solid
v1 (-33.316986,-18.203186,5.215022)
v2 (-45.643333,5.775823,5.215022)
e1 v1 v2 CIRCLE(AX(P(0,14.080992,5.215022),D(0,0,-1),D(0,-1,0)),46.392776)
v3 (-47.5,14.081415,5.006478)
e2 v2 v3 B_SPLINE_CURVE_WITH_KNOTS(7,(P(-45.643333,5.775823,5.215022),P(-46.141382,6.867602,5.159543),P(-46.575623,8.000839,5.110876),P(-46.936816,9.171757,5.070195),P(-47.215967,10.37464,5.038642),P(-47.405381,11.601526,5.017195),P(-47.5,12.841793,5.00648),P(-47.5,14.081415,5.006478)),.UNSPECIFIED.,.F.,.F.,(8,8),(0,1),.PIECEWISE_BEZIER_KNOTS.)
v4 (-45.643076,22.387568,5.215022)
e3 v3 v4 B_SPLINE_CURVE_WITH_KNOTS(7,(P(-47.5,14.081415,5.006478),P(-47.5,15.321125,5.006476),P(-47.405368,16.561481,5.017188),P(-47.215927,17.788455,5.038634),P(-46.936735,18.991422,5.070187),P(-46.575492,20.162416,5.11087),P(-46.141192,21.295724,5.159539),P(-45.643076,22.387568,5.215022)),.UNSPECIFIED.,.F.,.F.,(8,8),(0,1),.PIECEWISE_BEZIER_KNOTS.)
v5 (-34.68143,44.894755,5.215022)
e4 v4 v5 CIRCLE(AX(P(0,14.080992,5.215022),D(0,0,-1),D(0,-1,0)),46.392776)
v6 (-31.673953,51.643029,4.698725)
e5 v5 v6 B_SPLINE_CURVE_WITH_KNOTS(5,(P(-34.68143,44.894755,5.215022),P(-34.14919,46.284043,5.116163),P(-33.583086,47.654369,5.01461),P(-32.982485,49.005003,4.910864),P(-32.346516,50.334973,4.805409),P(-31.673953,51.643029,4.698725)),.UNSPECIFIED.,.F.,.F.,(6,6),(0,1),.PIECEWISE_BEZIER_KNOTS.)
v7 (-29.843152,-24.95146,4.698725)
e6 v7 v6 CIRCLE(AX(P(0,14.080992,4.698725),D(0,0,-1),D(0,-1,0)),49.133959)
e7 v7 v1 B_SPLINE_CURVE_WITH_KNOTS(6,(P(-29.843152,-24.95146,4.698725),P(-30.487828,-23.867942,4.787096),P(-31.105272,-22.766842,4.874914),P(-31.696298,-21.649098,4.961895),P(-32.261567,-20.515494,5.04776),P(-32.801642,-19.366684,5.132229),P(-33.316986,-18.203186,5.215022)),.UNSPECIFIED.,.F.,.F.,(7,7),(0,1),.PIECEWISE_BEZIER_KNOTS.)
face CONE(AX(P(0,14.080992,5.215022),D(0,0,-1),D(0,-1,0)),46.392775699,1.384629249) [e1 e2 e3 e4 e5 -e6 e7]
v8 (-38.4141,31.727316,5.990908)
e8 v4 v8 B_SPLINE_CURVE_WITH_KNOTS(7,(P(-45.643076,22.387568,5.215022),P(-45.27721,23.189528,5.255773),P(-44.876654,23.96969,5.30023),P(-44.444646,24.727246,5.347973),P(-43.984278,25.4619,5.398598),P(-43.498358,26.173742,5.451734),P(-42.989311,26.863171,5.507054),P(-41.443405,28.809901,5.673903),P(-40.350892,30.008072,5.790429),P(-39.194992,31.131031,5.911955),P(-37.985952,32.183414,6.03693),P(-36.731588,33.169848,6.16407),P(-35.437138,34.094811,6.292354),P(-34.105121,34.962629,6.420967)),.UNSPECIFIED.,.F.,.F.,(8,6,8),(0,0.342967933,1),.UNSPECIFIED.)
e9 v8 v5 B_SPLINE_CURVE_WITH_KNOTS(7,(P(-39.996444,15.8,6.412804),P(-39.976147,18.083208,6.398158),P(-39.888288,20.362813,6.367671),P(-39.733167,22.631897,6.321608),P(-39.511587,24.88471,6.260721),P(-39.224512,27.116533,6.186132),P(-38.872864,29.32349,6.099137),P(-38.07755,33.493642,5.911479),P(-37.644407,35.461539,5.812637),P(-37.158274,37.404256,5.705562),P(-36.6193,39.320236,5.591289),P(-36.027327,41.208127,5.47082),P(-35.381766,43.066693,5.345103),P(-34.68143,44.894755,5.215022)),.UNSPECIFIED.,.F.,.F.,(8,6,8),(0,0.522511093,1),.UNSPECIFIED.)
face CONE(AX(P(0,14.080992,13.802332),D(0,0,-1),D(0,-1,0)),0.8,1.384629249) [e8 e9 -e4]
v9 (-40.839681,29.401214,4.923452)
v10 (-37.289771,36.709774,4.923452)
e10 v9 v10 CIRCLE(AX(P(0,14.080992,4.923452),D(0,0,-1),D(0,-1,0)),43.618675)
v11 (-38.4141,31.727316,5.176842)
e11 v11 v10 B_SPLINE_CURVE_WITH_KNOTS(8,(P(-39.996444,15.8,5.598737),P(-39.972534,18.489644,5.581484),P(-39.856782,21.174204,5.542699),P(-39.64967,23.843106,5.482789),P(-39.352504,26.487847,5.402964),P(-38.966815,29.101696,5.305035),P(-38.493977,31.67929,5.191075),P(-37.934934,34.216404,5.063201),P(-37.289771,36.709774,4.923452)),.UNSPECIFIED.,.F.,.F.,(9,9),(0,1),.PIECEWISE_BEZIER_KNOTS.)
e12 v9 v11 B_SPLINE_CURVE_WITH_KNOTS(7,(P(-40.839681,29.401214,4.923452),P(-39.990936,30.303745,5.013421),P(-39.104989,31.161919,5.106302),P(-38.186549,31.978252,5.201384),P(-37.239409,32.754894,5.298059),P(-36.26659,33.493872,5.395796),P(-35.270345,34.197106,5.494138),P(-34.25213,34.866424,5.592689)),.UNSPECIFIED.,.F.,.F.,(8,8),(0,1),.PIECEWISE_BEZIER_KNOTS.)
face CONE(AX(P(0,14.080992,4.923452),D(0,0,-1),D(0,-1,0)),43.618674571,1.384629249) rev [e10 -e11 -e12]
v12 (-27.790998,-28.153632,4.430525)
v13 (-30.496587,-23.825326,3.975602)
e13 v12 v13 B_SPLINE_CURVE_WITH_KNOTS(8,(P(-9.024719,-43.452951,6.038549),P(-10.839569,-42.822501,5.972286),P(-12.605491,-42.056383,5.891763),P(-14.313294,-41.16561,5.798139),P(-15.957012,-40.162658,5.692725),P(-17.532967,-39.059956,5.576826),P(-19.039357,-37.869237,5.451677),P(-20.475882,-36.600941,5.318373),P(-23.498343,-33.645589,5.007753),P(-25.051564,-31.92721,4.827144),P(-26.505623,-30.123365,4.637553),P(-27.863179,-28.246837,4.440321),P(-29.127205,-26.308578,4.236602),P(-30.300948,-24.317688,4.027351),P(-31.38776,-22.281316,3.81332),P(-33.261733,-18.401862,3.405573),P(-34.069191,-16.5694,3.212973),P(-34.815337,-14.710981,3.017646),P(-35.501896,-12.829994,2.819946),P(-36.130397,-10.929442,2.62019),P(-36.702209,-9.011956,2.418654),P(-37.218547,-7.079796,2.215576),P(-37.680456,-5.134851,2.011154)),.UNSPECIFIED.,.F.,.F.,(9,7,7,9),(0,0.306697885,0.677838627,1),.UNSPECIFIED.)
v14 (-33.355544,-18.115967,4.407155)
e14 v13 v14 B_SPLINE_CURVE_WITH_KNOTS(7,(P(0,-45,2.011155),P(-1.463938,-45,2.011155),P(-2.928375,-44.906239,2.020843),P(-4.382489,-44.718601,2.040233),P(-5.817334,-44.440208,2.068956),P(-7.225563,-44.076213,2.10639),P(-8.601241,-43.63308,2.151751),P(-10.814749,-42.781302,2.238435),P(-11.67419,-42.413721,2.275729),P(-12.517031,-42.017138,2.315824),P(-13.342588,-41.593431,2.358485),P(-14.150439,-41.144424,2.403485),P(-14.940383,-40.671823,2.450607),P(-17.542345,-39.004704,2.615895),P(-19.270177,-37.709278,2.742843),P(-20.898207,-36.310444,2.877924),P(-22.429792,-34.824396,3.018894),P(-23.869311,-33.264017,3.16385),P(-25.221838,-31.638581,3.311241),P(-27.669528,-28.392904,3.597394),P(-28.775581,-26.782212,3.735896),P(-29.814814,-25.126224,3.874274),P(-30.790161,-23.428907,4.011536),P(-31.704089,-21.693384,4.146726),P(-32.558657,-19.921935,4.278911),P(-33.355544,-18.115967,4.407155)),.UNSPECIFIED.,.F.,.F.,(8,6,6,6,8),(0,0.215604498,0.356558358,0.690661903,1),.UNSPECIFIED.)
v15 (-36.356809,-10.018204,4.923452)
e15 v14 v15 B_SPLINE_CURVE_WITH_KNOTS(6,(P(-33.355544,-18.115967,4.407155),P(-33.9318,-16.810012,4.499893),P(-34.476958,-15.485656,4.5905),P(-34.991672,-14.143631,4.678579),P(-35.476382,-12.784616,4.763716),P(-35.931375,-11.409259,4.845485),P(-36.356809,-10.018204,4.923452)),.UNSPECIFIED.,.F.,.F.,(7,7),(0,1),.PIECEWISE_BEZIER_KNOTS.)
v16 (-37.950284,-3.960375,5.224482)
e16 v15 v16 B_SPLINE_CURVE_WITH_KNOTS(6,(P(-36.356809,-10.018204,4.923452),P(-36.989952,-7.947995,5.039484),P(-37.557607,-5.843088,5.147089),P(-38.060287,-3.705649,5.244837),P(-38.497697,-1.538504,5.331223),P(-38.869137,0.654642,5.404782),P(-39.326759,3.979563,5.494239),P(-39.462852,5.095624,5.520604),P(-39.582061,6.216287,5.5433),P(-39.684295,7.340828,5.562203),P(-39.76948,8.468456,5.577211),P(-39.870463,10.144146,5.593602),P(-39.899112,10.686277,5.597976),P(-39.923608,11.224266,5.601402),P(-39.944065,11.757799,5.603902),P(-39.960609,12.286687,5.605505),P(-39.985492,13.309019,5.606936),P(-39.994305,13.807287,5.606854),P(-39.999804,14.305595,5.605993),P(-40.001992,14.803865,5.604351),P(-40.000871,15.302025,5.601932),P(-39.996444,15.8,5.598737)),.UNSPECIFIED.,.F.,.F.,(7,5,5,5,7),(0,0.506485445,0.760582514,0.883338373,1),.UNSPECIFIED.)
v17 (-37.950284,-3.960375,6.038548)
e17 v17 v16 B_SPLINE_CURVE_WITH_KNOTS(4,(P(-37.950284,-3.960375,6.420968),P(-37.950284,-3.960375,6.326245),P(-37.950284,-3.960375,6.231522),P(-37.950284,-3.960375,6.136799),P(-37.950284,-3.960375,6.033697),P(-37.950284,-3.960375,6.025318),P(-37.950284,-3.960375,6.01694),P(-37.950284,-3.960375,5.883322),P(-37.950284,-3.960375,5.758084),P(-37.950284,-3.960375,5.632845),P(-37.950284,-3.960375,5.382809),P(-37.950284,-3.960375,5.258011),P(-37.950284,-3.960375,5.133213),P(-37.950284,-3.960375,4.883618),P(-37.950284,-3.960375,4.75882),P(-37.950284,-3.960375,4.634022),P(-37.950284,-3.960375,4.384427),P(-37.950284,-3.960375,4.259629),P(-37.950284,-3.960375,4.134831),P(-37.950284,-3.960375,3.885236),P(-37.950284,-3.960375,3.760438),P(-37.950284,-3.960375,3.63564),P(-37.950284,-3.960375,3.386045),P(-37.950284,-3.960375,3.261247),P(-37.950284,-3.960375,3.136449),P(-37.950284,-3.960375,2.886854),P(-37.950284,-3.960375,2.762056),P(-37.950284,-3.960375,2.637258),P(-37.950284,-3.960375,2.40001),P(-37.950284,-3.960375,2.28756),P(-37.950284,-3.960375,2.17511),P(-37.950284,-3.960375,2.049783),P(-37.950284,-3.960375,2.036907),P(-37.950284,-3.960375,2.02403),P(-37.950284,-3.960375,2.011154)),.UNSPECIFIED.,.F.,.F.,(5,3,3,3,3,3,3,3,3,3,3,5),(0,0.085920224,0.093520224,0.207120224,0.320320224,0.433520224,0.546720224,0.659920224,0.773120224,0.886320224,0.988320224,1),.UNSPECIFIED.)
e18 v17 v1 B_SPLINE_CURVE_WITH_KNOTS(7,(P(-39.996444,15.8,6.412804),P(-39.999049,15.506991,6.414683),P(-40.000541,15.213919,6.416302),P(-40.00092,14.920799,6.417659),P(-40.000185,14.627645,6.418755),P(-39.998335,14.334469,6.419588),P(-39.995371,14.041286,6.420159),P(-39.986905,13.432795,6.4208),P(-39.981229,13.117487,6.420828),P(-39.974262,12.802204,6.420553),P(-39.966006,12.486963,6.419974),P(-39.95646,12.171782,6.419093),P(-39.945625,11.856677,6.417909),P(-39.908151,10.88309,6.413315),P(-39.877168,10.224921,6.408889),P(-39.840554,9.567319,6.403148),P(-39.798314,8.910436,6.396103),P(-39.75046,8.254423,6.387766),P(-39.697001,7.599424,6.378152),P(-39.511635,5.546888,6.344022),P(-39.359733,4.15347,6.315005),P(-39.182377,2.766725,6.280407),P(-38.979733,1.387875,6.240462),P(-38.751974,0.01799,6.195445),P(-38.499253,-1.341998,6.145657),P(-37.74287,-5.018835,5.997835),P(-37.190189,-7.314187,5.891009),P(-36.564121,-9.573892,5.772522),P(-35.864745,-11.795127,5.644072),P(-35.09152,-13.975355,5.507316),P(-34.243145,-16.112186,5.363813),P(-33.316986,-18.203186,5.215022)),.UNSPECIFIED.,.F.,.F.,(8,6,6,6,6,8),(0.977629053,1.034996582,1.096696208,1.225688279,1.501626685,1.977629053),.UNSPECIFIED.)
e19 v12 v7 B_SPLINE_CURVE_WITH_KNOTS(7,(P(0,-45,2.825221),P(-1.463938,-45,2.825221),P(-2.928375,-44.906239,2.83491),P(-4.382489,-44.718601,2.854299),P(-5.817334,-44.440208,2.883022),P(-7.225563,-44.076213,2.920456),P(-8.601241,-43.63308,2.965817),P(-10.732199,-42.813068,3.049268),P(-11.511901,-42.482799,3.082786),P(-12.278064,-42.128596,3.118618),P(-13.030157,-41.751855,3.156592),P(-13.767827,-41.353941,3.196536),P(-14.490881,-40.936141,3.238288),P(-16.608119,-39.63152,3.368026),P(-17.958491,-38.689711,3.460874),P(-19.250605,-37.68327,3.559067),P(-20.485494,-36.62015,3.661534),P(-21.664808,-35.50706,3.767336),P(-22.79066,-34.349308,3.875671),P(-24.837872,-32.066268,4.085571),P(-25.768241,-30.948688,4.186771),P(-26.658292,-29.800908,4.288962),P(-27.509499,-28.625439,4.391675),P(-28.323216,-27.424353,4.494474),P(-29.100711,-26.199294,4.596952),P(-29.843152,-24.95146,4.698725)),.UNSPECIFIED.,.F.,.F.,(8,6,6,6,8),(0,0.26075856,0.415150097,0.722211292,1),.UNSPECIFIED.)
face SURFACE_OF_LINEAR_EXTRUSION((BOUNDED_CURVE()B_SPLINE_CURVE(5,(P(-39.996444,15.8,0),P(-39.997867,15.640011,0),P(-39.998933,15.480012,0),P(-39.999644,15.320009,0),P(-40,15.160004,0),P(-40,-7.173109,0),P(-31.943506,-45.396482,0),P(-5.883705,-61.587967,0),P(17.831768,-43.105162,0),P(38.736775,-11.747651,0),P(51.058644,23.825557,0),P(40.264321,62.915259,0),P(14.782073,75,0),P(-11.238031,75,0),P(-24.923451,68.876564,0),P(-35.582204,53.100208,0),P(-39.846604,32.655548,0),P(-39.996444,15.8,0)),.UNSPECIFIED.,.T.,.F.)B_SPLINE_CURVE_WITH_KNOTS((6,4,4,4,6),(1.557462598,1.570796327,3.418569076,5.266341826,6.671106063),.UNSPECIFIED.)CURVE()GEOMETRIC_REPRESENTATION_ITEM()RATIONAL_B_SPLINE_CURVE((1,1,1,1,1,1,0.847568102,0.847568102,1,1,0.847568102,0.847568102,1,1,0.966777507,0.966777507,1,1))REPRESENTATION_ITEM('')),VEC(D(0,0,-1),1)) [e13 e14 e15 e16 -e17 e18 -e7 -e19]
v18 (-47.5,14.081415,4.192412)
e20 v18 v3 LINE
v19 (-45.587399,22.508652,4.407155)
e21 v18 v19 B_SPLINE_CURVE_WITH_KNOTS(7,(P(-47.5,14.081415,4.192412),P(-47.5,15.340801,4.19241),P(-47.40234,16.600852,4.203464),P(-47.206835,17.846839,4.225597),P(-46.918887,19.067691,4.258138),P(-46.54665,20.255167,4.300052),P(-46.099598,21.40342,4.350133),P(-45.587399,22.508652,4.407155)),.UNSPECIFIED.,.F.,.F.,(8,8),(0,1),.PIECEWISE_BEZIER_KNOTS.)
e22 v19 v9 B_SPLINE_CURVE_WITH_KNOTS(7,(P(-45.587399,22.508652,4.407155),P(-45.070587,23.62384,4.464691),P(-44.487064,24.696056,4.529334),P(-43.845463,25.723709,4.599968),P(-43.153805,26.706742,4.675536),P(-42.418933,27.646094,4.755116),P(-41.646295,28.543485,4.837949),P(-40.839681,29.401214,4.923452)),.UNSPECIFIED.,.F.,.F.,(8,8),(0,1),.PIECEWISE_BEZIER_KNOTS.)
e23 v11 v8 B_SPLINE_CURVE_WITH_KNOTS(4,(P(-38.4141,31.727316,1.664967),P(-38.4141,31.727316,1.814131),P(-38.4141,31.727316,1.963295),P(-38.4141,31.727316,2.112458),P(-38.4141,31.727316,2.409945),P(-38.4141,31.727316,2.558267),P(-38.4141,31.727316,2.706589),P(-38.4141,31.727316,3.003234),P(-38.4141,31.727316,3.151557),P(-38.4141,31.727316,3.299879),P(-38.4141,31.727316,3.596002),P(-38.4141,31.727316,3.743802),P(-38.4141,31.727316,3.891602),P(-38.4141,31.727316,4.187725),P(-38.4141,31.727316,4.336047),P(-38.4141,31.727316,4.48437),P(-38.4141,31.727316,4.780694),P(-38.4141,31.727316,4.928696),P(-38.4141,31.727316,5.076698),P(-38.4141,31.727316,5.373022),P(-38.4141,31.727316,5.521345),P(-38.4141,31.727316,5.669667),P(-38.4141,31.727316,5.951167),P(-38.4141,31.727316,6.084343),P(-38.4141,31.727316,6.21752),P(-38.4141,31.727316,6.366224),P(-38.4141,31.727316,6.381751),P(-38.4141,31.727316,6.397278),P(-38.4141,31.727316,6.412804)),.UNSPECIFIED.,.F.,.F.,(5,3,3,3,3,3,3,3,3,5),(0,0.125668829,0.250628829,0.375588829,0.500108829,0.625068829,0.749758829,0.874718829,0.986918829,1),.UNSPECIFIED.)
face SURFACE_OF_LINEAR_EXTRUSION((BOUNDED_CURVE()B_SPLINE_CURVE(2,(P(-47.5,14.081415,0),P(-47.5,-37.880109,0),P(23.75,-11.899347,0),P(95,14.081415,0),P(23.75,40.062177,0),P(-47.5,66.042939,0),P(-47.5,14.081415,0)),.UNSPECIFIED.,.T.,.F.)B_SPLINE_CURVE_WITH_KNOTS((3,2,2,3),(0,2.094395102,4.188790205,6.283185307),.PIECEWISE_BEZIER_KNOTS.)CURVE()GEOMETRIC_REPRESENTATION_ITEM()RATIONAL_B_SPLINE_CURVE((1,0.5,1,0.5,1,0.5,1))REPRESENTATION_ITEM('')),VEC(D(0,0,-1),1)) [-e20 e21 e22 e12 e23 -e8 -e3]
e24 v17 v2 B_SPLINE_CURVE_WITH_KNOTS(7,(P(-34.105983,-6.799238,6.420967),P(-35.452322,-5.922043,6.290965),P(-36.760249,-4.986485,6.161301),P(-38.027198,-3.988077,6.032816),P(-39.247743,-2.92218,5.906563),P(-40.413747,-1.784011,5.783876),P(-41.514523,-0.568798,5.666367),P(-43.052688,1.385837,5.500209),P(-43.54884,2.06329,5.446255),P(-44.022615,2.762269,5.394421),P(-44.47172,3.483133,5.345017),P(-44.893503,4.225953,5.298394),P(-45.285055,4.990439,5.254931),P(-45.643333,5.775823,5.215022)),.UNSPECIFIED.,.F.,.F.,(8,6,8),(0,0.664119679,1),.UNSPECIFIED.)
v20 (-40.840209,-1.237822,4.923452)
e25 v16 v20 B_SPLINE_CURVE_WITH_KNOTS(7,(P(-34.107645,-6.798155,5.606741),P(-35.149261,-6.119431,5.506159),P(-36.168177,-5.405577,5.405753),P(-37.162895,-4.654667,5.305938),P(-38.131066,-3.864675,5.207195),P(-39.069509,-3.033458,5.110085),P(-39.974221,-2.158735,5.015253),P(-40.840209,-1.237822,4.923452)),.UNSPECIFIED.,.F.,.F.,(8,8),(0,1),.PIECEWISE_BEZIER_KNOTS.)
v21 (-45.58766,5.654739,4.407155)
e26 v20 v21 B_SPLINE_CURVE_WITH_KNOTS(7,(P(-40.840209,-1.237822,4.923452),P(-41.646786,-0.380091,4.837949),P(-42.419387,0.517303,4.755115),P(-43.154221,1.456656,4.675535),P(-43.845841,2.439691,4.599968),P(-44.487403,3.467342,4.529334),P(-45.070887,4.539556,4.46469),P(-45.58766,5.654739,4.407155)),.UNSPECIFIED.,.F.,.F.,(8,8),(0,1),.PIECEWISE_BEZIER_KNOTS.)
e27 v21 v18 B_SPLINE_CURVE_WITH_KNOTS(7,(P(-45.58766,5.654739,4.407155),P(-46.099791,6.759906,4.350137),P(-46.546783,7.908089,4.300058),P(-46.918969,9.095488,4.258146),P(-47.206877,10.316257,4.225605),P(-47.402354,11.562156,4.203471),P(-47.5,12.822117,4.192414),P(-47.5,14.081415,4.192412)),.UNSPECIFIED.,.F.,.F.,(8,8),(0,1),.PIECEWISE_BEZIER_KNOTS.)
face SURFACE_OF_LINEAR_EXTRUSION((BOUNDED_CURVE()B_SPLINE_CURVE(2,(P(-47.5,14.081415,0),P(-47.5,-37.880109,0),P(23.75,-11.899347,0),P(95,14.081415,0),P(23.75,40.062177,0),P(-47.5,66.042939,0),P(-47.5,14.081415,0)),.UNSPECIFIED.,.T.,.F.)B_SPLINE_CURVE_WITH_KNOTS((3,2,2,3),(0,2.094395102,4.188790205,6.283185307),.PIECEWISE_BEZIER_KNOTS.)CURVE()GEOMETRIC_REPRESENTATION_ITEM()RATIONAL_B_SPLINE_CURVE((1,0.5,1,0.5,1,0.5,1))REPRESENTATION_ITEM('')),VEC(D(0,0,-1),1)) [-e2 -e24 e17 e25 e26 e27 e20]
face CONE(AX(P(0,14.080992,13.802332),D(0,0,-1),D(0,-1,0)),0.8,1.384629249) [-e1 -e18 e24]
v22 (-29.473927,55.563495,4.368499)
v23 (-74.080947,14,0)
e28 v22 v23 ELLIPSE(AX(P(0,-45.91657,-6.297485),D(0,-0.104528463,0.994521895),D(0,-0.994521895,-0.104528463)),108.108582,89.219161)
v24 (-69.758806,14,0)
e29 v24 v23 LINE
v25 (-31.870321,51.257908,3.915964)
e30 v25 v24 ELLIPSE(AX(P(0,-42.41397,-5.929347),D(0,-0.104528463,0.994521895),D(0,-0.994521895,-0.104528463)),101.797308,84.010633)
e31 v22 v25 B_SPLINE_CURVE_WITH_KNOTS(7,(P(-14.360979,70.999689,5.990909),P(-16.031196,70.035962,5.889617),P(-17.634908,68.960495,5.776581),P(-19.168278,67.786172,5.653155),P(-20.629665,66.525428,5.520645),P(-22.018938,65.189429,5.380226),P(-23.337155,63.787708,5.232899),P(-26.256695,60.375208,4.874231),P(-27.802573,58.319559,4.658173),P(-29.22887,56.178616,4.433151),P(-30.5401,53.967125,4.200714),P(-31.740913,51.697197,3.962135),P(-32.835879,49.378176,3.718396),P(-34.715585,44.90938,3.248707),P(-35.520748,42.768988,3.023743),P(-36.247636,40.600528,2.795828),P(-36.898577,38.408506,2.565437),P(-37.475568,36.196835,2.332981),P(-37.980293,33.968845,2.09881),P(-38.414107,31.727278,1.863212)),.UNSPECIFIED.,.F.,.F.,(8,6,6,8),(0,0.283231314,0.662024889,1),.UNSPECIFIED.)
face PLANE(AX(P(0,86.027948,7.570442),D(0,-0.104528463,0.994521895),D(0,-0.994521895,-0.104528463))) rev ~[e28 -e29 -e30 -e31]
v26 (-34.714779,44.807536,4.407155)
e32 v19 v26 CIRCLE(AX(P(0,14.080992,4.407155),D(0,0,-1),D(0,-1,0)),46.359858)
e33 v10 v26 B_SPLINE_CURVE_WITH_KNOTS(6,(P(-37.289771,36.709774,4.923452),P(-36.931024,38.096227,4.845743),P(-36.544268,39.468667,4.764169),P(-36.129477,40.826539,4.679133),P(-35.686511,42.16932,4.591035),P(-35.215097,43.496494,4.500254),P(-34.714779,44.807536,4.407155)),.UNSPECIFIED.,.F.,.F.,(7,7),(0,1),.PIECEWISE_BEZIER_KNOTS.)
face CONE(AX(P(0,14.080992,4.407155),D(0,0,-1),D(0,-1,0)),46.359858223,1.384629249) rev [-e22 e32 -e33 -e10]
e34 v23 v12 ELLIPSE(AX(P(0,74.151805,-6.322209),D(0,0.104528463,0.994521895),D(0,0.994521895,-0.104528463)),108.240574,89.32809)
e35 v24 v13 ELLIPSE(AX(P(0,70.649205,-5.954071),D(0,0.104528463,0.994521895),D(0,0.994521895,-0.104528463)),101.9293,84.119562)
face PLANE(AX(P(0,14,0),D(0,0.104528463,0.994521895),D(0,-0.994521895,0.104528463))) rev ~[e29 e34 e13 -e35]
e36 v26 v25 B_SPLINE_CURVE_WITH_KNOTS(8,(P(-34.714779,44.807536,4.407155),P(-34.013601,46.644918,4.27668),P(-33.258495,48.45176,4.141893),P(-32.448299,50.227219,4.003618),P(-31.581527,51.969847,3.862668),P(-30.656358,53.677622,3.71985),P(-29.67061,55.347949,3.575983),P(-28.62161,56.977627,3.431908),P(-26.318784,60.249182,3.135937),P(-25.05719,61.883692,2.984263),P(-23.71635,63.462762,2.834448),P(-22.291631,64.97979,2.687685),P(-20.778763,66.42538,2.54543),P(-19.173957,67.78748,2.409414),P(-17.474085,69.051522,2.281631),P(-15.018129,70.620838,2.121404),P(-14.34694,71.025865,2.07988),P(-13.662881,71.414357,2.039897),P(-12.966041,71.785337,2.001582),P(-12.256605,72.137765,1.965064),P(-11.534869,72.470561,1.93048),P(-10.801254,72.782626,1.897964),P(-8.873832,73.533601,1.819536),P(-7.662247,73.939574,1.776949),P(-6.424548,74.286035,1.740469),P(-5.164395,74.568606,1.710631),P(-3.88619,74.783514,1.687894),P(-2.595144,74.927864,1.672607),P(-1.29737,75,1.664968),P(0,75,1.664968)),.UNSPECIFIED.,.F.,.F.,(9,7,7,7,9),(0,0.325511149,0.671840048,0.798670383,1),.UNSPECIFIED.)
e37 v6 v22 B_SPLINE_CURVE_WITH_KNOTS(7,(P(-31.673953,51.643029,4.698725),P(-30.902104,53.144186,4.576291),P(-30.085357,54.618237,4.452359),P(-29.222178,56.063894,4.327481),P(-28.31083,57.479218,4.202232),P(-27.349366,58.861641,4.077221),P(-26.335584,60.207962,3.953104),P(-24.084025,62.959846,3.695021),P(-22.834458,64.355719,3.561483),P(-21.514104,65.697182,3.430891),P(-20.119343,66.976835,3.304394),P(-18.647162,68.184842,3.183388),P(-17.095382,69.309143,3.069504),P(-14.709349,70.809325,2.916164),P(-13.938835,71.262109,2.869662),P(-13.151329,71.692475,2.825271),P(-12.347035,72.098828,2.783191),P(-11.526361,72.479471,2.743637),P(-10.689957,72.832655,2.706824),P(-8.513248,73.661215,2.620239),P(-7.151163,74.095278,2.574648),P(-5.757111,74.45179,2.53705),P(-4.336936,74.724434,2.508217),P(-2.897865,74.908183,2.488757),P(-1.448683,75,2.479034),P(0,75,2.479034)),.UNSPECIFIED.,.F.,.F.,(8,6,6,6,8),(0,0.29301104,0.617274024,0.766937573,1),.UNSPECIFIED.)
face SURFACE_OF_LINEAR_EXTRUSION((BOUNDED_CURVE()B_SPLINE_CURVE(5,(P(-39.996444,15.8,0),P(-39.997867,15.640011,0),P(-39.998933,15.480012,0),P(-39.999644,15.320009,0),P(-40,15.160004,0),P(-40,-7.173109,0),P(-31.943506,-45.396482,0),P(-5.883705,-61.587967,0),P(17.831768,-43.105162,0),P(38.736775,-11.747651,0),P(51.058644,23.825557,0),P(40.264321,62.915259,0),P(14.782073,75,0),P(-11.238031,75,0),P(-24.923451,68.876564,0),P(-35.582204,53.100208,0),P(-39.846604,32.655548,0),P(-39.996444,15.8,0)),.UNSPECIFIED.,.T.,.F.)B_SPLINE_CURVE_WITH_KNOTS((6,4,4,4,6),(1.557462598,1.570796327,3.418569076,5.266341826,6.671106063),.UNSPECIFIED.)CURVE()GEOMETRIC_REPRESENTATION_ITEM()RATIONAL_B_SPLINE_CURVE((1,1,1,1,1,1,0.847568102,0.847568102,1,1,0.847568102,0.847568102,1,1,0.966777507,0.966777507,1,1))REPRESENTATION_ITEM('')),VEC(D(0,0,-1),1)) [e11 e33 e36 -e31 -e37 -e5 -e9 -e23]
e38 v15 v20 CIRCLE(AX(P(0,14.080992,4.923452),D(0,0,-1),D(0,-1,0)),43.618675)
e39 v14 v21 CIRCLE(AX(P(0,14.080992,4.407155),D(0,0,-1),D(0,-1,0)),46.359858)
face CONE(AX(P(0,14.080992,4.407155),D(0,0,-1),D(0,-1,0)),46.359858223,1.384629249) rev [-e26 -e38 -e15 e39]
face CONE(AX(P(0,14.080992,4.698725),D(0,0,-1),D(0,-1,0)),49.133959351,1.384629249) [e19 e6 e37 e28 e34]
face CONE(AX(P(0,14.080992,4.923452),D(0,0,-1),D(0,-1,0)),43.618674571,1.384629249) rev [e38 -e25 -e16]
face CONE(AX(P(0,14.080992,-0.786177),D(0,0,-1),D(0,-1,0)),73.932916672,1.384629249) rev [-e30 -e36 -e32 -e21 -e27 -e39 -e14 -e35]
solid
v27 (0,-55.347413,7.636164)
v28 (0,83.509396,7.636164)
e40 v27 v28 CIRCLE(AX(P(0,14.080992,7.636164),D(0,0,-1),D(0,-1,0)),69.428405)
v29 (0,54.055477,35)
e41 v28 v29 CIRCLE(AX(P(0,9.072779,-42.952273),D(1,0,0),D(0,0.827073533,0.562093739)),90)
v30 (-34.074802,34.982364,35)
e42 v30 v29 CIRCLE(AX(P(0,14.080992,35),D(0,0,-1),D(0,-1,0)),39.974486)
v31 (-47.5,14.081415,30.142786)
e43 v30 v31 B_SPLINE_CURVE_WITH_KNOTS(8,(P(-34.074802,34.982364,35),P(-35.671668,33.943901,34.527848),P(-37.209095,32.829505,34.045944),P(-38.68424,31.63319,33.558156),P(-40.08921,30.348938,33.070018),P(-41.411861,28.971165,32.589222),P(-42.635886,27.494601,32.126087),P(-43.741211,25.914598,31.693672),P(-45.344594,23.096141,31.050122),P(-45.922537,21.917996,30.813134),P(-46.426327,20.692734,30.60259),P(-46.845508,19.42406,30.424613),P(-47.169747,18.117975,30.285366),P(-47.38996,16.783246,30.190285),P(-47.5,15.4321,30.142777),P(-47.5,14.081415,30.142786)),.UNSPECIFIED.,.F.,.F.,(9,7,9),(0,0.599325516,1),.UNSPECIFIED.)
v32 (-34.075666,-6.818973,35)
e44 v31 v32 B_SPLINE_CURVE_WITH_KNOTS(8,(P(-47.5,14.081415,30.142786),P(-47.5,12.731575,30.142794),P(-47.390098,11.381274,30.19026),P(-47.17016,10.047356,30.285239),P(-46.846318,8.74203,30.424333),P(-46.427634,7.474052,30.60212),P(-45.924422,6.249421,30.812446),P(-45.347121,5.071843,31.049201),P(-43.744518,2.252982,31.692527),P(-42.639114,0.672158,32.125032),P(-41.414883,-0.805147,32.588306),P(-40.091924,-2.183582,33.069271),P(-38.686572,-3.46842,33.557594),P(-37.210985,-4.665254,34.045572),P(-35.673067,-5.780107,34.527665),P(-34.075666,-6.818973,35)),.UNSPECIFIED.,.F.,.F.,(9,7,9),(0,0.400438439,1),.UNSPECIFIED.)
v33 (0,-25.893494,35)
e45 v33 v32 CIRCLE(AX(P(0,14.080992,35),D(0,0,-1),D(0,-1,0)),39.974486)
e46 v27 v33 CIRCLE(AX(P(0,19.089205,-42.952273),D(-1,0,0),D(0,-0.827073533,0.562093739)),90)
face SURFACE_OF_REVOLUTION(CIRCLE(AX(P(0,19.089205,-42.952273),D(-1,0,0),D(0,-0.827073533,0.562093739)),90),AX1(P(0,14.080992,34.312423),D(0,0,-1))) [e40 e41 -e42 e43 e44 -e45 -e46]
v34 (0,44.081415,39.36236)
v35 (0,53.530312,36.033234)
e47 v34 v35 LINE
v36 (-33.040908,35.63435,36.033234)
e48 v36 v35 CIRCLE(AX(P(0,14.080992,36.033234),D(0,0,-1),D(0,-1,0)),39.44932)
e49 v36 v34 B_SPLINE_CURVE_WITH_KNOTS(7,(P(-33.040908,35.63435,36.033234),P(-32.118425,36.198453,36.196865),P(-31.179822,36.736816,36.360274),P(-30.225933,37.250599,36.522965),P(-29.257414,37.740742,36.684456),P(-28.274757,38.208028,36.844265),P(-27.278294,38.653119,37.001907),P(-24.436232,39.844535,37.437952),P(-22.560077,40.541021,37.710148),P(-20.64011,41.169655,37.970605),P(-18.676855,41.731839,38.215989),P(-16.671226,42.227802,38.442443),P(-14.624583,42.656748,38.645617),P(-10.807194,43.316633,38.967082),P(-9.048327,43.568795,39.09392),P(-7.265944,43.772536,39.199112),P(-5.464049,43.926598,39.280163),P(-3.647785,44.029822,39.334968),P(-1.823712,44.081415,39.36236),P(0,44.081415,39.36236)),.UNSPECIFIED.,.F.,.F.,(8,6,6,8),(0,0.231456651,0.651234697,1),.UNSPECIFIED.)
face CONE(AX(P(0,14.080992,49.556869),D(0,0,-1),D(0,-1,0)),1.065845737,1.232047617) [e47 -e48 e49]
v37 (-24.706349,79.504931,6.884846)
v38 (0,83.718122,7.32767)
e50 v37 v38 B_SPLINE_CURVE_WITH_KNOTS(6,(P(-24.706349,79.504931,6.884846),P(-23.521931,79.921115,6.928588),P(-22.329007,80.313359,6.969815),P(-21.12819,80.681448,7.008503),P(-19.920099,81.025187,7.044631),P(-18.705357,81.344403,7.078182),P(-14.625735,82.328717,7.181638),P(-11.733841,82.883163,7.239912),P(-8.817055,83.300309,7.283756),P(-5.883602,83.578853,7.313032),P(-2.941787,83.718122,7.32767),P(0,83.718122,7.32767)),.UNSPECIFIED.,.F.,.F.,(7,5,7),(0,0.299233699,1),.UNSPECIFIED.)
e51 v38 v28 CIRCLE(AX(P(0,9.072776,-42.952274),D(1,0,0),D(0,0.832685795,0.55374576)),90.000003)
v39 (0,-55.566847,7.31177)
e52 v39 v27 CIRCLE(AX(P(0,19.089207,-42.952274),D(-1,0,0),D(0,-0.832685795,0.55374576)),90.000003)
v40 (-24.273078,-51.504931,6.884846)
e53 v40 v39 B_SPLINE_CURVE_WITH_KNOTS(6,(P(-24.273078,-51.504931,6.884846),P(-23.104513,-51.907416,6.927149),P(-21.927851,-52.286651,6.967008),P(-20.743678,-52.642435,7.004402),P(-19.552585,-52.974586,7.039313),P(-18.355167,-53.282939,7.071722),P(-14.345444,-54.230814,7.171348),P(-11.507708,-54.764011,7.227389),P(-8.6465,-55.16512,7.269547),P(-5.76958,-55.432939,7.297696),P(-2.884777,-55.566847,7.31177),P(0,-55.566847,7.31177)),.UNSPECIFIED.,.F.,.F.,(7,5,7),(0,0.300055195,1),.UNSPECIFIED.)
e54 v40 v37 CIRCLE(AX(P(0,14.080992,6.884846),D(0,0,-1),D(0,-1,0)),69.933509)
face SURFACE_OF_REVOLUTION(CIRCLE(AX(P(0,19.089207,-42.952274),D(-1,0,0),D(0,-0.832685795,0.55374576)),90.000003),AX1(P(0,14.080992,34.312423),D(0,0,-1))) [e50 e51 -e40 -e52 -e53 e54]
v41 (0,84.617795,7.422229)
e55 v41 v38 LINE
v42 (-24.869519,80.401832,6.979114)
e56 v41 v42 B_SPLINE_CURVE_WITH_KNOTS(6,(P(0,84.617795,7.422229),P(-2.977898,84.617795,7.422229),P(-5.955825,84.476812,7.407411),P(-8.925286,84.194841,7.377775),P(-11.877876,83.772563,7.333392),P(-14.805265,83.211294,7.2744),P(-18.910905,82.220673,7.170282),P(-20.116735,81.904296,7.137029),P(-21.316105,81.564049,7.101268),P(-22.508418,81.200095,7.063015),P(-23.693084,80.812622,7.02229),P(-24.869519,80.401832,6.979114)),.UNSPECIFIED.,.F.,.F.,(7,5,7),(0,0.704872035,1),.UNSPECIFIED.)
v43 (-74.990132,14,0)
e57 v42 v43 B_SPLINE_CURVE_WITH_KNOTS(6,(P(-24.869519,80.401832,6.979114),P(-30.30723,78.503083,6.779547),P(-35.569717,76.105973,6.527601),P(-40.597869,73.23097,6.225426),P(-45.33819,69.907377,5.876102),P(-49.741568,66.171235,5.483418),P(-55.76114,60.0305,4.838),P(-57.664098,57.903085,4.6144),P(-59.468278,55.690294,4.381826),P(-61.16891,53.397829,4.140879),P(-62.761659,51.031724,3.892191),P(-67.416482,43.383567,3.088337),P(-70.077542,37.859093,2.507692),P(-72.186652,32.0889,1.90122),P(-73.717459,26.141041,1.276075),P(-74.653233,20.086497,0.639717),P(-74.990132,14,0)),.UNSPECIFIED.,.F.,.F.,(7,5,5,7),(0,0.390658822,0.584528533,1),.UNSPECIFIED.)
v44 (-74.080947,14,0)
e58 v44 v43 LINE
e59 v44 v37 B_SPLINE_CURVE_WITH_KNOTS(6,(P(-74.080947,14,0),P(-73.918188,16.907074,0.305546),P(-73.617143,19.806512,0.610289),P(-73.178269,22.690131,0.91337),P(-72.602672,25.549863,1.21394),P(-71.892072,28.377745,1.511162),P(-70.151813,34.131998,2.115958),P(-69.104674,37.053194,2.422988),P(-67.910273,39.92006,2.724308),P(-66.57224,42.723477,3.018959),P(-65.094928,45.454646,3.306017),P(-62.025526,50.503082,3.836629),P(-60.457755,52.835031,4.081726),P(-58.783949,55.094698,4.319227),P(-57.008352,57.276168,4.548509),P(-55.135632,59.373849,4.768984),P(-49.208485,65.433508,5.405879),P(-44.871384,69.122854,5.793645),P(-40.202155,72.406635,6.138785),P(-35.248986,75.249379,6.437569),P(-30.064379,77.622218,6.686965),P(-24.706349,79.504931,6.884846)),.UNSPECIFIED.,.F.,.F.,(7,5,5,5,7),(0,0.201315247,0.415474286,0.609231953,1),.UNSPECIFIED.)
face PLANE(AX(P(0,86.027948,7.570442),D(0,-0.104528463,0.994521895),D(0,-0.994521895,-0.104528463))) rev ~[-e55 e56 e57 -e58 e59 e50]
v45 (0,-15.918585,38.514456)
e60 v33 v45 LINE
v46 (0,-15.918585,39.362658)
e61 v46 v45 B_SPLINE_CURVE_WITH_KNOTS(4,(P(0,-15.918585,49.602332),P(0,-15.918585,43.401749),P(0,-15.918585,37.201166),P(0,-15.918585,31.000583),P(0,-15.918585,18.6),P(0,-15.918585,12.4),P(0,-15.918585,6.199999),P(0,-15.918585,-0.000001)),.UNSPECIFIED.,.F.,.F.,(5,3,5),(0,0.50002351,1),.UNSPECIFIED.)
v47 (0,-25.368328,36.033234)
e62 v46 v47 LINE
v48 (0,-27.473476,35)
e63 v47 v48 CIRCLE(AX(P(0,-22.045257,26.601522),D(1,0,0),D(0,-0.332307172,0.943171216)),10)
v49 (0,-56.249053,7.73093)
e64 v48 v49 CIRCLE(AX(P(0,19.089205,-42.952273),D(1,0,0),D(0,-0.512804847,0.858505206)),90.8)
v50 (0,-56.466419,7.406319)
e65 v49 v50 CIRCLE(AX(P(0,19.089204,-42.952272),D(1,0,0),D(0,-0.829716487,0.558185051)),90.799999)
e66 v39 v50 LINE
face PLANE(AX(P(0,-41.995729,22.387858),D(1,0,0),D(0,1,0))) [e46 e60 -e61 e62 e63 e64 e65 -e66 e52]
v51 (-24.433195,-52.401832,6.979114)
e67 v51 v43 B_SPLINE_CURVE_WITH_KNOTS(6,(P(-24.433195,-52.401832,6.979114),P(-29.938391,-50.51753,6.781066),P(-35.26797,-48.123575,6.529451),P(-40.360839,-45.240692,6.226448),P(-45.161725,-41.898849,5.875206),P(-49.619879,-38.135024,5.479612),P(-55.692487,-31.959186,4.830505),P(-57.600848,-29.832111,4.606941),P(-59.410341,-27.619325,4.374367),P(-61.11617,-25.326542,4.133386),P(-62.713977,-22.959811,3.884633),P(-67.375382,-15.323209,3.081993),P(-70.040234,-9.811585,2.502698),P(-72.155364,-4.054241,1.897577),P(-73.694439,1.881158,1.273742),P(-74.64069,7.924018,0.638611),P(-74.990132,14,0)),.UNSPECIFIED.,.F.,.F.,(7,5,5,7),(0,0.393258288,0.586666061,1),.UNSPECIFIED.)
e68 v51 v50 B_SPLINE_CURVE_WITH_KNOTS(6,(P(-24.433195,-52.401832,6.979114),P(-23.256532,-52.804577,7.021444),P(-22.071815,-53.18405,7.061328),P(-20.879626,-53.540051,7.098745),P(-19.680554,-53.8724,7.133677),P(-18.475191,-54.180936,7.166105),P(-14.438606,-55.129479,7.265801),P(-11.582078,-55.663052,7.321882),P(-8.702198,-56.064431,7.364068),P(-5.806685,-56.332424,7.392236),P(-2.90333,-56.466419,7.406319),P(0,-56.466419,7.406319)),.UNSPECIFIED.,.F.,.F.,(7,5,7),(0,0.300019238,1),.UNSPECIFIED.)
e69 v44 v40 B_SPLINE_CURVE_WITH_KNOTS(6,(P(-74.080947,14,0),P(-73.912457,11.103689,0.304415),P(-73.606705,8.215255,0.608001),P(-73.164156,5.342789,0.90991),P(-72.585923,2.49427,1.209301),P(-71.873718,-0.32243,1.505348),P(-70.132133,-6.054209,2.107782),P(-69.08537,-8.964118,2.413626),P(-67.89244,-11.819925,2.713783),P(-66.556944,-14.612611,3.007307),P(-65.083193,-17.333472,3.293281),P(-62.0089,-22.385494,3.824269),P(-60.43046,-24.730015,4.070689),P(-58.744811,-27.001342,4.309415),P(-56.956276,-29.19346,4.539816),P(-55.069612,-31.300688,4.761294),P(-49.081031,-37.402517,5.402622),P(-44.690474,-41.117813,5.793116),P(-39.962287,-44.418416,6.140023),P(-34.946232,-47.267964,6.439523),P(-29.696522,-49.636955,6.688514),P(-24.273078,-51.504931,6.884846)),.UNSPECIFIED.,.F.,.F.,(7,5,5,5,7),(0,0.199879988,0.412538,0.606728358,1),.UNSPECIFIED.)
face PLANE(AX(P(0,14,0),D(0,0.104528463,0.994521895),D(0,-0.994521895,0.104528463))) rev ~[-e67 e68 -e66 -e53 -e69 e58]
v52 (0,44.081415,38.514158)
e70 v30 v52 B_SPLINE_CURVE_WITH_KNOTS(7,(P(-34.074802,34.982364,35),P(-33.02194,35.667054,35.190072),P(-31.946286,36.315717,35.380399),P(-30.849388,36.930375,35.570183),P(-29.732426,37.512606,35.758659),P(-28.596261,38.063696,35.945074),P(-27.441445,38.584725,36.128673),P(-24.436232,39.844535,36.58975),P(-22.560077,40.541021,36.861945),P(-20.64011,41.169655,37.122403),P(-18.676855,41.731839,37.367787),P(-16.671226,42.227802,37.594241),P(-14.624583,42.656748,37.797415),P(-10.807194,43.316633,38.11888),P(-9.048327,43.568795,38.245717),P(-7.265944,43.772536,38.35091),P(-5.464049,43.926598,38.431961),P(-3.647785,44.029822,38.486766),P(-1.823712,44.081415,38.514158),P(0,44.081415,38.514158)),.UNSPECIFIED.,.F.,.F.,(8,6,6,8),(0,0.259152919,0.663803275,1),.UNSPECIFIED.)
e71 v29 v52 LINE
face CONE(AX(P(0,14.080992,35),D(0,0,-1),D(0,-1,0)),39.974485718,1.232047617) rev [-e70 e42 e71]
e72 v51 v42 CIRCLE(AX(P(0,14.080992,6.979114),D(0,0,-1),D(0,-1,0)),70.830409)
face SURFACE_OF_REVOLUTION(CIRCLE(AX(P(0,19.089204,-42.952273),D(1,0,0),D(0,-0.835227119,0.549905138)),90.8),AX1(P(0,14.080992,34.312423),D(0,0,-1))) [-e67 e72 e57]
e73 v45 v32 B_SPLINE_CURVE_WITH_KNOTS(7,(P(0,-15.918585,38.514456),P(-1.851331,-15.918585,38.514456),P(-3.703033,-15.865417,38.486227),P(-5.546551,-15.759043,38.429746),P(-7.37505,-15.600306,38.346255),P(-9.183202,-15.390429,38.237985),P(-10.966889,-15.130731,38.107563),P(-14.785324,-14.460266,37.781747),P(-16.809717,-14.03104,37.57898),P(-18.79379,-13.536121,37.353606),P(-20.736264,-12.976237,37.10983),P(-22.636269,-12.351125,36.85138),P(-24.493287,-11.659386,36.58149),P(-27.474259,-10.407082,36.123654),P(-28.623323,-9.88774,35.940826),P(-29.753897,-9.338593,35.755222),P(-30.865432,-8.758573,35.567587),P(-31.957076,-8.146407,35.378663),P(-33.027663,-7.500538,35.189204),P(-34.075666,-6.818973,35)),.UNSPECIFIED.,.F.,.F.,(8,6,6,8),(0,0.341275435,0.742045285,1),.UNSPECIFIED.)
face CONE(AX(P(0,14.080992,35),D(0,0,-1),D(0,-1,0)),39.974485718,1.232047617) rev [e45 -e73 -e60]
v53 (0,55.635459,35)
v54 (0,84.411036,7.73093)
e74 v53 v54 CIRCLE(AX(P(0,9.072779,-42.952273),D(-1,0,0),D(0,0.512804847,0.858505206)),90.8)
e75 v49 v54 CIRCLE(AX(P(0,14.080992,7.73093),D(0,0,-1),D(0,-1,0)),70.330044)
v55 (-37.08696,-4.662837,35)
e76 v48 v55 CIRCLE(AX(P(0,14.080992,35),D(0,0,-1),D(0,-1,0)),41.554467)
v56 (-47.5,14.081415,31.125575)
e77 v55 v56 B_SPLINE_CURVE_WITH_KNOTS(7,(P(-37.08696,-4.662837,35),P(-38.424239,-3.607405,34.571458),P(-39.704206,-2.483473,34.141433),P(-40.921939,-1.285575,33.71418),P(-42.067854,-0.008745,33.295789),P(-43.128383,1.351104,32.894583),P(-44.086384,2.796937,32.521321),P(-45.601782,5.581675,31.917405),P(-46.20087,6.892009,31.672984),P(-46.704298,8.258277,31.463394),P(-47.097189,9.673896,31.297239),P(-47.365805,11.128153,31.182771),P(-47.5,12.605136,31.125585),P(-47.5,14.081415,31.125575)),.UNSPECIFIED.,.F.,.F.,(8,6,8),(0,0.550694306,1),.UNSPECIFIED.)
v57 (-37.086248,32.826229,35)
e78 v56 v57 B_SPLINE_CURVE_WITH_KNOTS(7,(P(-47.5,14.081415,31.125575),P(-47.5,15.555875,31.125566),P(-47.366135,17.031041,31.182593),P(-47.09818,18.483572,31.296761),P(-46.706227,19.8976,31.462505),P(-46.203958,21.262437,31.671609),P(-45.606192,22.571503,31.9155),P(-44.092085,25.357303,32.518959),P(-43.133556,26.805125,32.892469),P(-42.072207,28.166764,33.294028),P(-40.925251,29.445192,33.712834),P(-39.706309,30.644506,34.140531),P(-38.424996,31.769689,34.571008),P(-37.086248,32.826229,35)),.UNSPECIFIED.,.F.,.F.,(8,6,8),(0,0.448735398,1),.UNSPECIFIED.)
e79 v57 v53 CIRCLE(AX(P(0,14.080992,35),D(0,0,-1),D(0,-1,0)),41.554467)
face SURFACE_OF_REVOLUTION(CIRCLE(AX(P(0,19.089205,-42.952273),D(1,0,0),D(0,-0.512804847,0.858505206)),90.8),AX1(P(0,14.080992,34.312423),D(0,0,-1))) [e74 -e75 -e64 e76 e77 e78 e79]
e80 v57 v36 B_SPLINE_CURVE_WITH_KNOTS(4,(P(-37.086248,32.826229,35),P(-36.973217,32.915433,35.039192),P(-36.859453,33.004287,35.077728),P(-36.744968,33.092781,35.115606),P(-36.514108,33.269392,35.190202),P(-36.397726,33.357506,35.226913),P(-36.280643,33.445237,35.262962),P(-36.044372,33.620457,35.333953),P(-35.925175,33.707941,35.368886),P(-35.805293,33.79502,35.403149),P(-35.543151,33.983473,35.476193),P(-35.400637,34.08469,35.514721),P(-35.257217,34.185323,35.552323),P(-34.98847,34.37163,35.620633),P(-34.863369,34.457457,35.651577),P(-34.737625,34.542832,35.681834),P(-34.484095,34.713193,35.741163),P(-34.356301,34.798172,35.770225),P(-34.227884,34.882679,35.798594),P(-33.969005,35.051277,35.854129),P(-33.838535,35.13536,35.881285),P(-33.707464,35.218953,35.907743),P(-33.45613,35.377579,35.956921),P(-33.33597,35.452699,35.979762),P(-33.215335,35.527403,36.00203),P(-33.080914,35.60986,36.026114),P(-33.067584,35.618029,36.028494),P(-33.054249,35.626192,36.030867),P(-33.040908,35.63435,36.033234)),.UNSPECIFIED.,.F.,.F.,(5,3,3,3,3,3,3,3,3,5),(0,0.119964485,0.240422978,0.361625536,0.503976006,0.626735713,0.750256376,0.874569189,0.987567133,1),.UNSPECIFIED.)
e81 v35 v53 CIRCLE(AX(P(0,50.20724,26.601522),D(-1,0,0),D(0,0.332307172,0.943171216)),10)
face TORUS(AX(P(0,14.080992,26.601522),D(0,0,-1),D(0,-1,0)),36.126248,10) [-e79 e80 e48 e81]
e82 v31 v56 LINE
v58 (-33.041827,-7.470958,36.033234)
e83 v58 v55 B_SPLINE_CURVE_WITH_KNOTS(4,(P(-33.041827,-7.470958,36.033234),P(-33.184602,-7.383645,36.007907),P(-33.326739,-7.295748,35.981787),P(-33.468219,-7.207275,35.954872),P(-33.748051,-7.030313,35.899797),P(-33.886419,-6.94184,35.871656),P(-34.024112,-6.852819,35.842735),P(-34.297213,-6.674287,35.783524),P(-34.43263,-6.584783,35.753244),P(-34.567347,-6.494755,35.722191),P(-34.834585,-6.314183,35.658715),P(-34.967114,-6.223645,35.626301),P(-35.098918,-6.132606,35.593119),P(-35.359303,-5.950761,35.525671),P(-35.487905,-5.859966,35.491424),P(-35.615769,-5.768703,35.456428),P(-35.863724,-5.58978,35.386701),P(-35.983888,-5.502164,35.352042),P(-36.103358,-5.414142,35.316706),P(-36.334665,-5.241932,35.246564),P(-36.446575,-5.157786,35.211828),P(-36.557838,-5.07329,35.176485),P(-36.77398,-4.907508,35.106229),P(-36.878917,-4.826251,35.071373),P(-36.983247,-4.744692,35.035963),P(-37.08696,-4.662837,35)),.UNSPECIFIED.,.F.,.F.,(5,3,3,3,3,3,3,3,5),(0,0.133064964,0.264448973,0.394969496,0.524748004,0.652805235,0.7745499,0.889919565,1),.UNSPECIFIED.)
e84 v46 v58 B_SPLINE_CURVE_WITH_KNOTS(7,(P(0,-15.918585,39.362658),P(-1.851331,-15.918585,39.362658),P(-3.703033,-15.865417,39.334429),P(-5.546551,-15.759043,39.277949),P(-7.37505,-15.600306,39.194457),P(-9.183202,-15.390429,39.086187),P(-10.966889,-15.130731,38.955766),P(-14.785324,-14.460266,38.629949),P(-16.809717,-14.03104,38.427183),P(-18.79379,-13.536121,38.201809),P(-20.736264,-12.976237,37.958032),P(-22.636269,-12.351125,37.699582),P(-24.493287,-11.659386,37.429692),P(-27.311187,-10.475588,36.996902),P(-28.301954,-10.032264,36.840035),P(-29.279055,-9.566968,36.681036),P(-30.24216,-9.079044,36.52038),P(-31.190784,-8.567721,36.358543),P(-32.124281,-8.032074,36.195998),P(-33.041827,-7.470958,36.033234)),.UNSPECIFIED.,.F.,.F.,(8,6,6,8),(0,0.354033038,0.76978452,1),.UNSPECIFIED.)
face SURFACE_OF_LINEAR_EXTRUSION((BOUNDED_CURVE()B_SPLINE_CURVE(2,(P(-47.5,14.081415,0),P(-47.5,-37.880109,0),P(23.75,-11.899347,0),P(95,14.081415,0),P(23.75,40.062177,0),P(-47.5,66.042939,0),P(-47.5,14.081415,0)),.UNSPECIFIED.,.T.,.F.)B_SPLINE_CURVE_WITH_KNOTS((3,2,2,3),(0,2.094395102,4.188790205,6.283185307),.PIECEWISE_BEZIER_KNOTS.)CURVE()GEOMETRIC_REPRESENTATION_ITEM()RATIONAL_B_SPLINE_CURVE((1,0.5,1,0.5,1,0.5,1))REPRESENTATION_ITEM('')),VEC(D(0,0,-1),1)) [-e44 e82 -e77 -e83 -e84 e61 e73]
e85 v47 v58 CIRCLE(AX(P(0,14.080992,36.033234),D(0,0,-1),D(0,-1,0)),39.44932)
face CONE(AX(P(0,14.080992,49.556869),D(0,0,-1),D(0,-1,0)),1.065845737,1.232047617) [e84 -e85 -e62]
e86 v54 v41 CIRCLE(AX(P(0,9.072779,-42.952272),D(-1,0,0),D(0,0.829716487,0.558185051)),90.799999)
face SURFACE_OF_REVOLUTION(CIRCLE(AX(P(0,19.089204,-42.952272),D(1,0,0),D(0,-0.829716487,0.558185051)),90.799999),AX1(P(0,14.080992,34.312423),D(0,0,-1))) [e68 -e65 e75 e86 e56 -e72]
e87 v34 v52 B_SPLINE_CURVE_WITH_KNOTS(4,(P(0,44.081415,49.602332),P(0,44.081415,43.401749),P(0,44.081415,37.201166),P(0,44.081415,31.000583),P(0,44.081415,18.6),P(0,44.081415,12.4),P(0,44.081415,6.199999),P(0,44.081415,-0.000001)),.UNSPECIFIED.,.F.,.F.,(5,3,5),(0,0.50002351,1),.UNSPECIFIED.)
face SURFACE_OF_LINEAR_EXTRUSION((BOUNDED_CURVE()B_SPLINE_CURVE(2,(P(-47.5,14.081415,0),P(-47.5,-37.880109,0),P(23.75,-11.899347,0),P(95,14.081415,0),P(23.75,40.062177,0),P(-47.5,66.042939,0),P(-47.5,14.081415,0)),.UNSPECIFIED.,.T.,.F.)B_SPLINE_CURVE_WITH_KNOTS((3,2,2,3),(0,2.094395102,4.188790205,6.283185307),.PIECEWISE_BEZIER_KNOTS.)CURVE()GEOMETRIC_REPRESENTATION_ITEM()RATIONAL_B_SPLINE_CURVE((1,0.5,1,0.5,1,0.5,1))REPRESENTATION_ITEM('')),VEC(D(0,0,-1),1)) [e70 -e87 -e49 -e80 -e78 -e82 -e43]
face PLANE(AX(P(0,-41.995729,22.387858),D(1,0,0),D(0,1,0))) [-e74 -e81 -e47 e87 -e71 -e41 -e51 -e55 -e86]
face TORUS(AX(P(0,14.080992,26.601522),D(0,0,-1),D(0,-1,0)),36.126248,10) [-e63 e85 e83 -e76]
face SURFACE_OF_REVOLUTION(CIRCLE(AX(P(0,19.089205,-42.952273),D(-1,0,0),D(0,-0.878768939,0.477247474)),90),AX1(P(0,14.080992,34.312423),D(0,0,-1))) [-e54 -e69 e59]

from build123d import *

# Parameters (mm, degrees)
F1_ANGLE = 180
F3_DEPTH = 16
F4_DEPTH = 10
F6_DEPTH = 100
F8_DEPTH = 120


# Not quite as in the source:
# - a feature names something its author has since deleted; it is built from what else it names


with BuildPart() as f1:
    # F0 (on Right) → F1 (revolve)
    with BuildSketch(Plane.YZ):
        with BuildLine():
            ThreePointArc((-55.3474134292, 7.6361638259), (-42.1679434739, 22.9837707191), (-25.8934941894, 35))
            Line((-25.8934941894, 35), (-27.4734756347, 35))
            ThreePointArc((-27.4734756347, 35), (-43.3676619435, 22.9550852631), (-56.2490525257, 7.7309299136))
            Line((-56.2490525257, 7.7309299136), (-55.3474134292, 7.6361638259))
        make_face()
        with BuildLine():
            Line((-27.4734756347, 35), (-25.8934941894, 35))
            Line((-25.8934941894, 35), (13.2809915289, 48.8023323047))
            Line((13.2809915289, 48.8023323047), (13.2809915289, 20.0909134001))
            Line((13.2809915289, 20.0909134001), (13.2809915289, 13.8023323047))
            Line((13.2809915289, 13.8023323047), (-32.3117841705, 5.2150216288))
            Line((-32.3117841705, 5.2150216288), (-29.5376830425, 4.9234518512))
            Line((-29.5376830425, 4.9234518512), (13.4290663861, 13.0161555837))
            Line((13.4290663861, 13.0161555837), (14.0809915289, 13.1389444171))
            Line((14.0809915289, 13.1389444171), (14.0809915289, 13.8023323047))
            Line((14.0809915289, 13.8023323047), (14.0809915289, 19.0225130607))
            Line((14.0809915289, 19.0225130607), (14.0809915289, 49.6023323047))
            Line((14.0809915289, 49.6023323047), (13.0151457916, 49.5568692779))
            Line((13.0151457916, 49.5568692779), (-25.3683284456, 36.0332337607))
            ThreePointArc((-25.3683284456, 36.0332337607), (-26.4512940518, 35.5785386451), (-27.4734756347, 35))
        make_face()
        with BuildLine():
            ThreePointArc((-60, 0), (-58.0031545142, 3.4887455953), (-55.8525170272, 6.8848457297))
            Line((-55.8525170272, 6.8848457297), (-56.7494178536, 6.9791138051))
            ThreePointArc((-56.7494178536, 6.9791138051), (-59.2223551886, 3.0035715179), (-61.4870824341, -1.0941554183))
            Line((-61.4870824341, -1.0941554183), (-59.8519251428, -0.786176721))
            Line((-59.8519251428, -0.786176721), (-53.878297587, 0.3389444171))
            Line((-53.878297587, 0.3389444171), (-32.2788666941, 4.407155239))
            Line((-32.2788666941, 4.407155239), (-35.052967822, 4.6987250166))
            Line((-35.052967822, 4.6987250166), (-60, 0))
        make_face()
        with BuildLine():
            ThreePointArc((-55.8525170272, 6.8848457297), (-55.6009099356, 7.2611398951), (-55.3474134292, 7.6361638259))
            Line((-55.3474134292, 7.6361638259), (-56.2490525257, 7.7309299136))
            ThreePointArc((-56.2490525257, 7.7309299136), (-56.500169896, 7.3556439459), (-56.7494178536, 6.9791138051))
            Line((-56.7494178536, 6.9791138051), (-55.8525170272, 6.8848457297))
        make_face()
        Polygon((-29.5376830425, 4.9234518512), (-32.3117841705, 5.2150216288), (-35.052967822, 4.6987250166), (-32.2788666941, 4.407155239), align=None)
    revolve(axis=Axis((0, 14.0809915289, 34.3124226827), (0, 0, -1)), revolution_arc=F1_ANGLE)

    # F2 (on Top) → F3 (cut)
    with BuildSketch(Plane.XY):
        with BuildLine():
            add(Edge.make_bspline(
                [(-40, 15), (-40, -129.8528137424), (28.2842712475, -27.4264068712), (96.5685424949, 75), (0, 75)],
                knots=[1.5707963268, 1.5707963268, 1.5707963268, 3.926990817, 3.926990817, 6.2831853072, 6.2831853072, 6.2831853072], degree=2, weights=[1, 0.3826834324, 1, 0.3826834324, 1]))
            add(Edge.make_bspline(
                [(0, 75), (-39.4701752826, 75), (-39.9964442864, 15.8)],
                knots=[0, 0, 0, 1.5574625984, 1.5574625984, 1.5574625984], degree=2, weights=[1, 0.7118052168, 1]))
            Line((-39.9964442864, 15.8), (0, 15.8))
            Line((0, 15.8), (0, 15))
            Line((0, 15), (-40, 15))
        make_face()
        with BuildLine():
            Line((0, 15.8), (-39.9964442864, 15.8))
            add(Edge.make_bspline(
                [(-39.9964442864, 15.8), (-40, 15.4000177794), (-40, 15)],
                knots=[1.5574625984, 1.5574625984, 1.5574625984, 1.5707963268, 1.5707963268, 1.5707963268], degree=2, weights=[1, 0.9999777765, 1]))
            Line((-40, 15), (0, 15))
            Line((0, 15), (0, 15.8))
        make_face()
    extrude(amount=F3_DEPTH, mode=Mode.SUBTRACT)

    # F2 (on Top) → F4 (cut)
    with BuildSketch(Plane.XY):
        with BuildLine():
            add(Edge.make_bspline(
                [(-40, 15), (-40, -129.8528137424), (28.2842712475, -27.4264068712), (96.5685424949, 75), (0, 75)],
                knots=[1.5707963268, 1.5707963268, 1.5707963268, 3.926990817, 3.926990817, 6.2831853072, 6.2831853072, 6.2831853072], degree=2, weights=[1, 0.3826834324, 1, 0.3826834324, 1]))
            add(Edge.make_bspline(
                [(0, 75), (-39.4701752826, 75), (-39.9964442864, 15.8)],
                knots=[0, 0, 0, 1.5574625984, 1.5574625984, 1.5574625984], degree=2, weights=[1, 0.7118052168, 1]))
            Line((-39.9964442864, 15.8), (0, 15.8))
            Line((0, 15.8), (0, 15))
            Line((0, 15), (-40, 15))
        make_face()
    extrude(amount=F4_DEPTH, mode=Mode.SUBTRACT)

    # F5 (on Top) → F6 (cut)
    with BuildSketch(Plane.XY):
        with BuildLine():
            add(Edge.make_bspline(
                [(-47.5, 14.081414789), (-47.5, -37.8801094381), (23.75, -11.8993473246), (95, 14.081414789), (23.75, 40.0621769025), (-47.5, 66.042939016), (-47.5, 14.081414789)],
                knots=[0, 0, 0, 2.0943951024, 2.0943951024, 4.1887902048, 4.1887902048, 6.2831853072, 6.2831853072, 6.2831853072], degree=2, weights=[1, 0.5, 1, 0.5, 1, 0.5, 1]))
        make_face()
    extrude(amount=F6_DEPTH, mode=Mode.SUBTRACT)

    # F7 (on Right) → F8 (cut)
    with BuildSketch(Plane.YZ):
        Polygon((94.4246426225, 0), (14, 0), (14, -1.5881112777), (94.696611166, -1.5881112777), align=None)
        Polygon((-66.4246426225, 0), (0, 0), (14, 0), (-58.0279476422, 7.5704423547), align=None)
        Polygon((86.0279476422, 7.5704423547), (14, 0), (94.4246426225, 0), align=None)
        Polygon((14, 0), (0, 0), (-66.4246426225, 0), (-66.696611166, -1.5881112777), (14, -1.5881112777), align=None)
    extrude(amount=-F8_DEPTH, mode=Mode.SUBTRACT)


solid = f1.part
